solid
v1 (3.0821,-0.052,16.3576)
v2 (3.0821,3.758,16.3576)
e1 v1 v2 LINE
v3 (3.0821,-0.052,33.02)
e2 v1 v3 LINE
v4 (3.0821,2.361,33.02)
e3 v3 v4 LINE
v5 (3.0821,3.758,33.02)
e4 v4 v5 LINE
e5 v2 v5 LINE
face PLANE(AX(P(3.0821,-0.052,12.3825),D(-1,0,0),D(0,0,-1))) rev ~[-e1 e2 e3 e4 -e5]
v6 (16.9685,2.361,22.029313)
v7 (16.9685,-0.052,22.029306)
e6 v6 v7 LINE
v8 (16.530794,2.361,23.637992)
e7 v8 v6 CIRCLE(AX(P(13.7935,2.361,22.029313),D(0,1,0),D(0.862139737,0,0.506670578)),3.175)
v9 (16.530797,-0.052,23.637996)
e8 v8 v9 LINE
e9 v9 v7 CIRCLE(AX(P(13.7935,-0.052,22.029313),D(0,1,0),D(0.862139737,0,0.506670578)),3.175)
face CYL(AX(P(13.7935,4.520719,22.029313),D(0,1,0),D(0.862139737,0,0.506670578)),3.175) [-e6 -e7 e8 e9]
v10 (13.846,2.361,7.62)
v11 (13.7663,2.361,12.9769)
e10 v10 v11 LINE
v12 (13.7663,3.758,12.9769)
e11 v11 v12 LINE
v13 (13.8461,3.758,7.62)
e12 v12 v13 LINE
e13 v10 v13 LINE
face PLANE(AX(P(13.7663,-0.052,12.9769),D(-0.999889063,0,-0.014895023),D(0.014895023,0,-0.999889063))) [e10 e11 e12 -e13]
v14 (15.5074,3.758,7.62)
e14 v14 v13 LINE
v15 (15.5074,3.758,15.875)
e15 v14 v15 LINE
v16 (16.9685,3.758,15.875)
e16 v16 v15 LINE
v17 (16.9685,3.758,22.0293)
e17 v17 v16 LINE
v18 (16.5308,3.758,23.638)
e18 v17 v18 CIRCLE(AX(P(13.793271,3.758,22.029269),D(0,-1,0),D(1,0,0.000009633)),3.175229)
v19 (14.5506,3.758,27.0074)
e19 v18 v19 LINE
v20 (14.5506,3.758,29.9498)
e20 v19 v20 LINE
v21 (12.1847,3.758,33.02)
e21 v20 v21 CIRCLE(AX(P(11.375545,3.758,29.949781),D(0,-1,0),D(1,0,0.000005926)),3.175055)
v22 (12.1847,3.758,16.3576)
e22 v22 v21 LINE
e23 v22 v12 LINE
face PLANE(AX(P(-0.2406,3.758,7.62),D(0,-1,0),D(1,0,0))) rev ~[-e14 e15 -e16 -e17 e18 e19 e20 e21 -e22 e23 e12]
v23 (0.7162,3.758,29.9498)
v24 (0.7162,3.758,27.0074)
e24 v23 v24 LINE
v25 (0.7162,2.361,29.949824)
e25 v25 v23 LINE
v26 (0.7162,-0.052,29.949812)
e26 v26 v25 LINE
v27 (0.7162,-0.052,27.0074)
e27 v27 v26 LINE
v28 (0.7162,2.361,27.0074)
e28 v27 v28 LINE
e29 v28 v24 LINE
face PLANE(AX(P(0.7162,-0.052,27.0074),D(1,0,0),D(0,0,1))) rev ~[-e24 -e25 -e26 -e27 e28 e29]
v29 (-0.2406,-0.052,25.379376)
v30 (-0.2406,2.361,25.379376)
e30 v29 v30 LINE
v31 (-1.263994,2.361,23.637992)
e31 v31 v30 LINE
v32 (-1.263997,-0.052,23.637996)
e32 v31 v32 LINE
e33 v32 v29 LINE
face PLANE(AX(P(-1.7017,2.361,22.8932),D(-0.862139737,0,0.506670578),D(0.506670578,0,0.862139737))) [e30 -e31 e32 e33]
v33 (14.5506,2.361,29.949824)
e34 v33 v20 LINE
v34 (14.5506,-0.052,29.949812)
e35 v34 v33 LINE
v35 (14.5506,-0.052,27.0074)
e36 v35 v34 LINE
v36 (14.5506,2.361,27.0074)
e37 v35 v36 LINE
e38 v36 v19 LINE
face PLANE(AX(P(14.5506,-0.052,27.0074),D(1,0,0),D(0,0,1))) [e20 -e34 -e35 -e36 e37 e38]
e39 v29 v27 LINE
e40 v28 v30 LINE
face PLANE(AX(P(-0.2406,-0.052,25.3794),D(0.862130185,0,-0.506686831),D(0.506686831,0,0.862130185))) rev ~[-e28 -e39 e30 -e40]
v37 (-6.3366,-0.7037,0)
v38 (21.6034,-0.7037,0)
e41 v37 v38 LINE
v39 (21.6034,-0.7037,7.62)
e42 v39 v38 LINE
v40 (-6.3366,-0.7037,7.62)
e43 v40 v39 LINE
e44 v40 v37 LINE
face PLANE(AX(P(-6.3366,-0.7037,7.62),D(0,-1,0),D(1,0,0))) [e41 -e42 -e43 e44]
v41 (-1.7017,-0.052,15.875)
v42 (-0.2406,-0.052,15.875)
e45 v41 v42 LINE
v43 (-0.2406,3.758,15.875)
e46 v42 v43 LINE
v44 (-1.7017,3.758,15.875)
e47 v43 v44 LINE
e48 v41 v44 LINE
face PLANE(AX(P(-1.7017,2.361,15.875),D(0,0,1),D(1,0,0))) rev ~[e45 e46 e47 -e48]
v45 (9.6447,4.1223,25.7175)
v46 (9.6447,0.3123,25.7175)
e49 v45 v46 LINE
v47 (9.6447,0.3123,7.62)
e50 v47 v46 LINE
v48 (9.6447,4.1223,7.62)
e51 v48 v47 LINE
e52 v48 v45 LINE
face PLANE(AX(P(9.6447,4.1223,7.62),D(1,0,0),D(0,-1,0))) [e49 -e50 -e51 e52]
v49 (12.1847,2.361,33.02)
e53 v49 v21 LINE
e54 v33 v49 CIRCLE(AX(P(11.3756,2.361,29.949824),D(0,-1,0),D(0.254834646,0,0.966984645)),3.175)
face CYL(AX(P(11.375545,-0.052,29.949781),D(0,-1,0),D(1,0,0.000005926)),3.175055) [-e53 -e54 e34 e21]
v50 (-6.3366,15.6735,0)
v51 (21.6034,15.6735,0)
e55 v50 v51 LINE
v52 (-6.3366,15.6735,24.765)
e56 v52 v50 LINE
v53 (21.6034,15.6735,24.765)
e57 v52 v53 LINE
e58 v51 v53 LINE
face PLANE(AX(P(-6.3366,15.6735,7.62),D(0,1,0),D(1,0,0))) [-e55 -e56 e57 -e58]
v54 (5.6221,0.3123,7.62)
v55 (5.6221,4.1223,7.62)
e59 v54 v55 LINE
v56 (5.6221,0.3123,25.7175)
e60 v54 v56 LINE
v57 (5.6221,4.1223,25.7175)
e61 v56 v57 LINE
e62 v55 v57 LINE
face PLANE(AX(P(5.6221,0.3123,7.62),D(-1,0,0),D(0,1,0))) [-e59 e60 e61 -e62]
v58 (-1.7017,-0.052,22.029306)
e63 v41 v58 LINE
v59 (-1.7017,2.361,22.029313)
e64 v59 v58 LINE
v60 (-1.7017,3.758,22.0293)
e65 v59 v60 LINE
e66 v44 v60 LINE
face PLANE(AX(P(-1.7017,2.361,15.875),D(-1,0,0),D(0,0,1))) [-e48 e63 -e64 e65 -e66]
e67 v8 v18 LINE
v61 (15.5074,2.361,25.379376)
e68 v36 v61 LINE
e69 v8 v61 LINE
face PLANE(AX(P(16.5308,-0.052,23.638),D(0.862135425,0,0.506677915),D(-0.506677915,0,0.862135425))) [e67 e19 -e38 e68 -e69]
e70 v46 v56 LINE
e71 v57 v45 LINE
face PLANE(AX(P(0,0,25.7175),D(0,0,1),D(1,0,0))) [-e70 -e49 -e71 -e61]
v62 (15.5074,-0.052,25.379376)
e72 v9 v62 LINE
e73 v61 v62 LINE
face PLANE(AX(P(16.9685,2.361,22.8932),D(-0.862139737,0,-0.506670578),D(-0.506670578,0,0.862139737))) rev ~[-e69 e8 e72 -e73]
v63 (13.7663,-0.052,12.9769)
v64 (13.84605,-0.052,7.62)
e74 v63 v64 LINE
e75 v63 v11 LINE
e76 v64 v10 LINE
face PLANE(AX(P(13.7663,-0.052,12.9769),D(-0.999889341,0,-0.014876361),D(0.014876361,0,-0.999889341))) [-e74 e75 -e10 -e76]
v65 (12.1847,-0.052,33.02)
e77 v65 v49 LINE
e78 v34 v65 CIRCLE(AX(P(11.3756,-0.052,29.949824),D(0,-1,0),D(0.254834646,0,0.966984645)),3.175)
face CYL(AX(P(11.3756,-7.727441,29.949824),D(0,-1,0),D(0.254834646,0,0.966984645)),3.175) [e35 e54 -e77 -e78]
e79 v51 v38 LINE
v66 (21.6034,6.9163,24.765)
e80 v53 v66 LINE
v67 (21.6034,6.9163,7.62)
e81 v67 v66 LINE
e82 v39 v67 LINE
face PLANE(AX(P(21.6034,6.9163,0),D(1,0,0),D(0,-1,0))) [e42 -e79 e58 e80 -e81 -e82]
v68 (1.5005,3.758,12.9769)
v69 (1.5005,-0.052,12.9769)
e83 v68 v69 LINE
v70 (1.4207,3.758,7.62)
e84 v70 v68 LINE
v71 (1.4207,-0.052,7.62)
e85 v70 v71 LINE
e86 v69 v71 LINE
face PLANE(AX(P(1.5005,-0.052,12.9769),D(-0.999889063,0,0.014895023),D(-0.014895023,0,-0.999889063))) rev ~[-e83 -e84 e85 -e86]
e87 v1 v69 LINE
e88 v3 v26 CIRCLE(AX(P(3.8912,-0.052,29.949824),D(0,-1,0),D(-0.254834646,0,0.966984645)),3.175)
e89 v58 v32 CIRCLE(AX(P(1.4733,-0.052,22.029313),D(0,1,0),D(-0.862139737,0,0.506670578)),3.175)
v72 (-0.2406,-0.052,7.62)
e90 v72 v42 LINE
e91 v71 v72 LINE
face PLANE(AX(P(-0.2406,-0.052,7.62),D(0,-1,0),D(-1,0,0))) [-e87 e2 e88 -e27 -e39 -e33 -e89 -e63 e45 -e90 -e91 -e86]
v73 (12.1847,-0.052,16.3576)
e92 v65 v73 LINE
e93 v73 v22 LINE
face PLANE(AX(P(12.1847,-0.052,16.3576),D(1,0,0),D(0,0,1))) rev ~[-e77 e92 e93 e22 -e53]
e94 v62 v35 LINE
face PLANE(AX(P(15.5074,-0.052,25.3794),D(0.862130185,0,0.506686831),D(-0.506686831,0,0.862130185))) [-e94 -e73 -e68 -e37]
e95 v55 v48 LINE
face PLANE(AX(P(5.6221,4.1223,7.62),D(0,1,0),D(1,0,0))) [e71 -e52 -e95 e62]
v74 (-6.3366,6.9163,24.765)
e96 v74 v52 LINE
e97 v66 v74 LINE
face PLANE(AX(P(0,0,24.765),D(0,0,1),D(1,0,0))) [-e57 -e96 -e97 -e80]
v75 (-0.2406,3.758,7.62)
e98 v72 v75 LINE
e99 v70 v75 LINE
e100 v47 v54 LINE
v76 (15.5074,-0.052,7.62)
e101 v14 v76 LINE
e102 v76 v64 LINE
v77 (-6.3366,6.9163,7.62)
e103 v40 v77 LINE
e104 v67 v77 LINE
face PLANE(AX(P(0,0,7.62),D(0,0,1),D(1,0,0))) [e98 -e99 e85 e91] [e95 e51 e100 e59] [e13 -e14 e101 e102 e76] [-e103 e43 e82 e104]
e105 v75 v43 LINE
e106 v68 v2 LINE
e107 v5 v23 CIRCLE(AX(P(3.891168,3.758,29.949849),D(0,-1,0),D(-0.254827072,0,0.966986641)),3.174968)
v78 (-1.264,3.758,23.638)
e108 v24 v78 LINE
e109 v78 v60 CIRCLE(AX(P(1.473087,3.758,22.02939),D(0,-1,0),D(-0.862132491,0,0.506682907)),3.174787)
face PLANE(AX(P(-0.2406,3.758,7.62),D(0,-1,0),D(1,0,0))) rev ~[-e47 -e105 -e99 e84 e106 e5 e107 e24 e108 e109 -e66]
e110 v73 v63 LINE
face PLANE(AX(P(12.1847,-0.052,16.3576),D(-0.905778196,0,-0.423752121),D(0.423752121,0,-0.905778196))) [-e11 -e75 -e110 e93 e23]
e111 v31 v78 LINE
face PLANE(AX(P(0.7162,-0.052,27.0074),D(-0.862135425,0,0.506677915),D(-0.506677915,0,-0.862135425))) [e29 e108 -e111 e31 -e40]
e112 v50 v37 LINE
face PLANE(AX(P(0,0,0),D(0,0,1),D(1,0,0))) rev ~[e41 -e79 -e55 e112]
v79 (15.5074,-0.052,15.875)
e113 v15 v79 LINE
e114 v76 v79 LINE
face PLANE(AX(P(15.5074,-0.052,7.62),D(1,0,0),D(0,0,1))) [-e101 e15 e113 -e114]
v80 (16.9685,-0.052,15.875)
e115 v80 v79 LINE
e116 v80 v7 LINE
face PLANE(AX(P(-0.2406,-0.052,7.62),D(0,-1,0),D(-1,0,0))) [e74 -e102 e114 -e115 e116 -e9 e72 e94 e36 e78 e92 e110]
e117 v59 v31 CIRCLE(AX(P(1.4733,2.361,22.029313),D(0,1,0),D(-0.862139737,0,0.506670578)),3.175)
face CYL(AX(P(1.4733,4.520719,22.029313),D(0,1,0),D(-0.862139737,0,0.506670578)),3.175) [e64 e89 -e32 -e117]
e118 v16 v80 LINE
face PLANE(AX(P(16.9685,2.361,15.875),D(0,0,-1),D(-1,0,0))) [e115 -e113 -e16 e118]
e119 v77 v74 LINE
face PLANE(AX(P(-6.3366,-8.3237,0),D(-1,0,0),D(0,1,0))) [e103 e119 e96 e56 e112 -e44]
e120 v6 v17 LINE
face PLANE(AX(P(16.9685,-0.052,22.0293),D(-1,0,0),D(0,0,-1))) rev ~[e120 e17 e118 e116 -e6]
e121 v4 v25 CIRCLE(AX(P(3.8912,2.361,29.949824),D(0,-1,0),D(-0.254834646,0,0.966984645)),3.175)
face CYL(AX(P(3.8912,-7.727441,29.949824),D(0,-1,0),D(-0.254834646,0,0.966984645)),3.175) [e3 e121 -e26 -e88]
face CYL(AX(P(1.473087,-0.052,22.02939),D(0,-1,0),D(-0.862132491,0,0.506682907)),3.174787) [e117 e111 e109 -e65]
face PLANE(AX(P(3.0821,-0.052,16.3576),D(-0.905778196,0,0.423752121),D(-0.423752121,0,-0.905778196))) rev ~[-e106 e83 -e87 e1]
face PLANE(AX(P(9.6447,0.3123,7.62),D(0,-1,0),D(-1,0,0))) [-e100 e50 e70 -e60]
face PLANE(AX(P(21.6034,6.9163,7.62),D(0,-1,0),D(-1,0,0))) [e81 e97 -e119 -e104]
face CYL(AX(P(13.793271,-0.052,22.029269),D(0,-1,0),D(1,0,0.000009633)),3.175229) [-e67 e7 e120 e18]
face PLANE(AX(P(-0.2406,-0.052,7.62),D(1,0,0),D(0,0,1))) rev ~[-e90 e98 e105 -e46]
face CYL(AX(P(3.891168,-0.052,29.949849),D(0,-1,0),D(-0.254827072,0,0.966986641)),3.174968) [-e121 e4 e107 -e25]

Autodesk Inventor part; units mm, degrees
ref_plane "YZ Plane" through (0, 0, 0) normal (1, 0, 0) x (0, 1, 0)
ref_plane "XZ Plane" through (0, 0, 0) normal (0, 1, 0) x (-1, 0, 0)
ref_plane "XY Plane" through (0, 0, 0) normal (0, 0, 1) x (1, 0, 0)
sketch "Sketch1" plane through (0, 0, 0) normal (0, 0, 1) x (1, 0, 0)
  line L0 (-6.3366, 6.9163) -> (21.6034, 6.9163)
  line L1 (21.6034, 6.9163) -> (21.6034, -8.3237)
  line L2 (21.6034, -8.3237) -> (-6.3366, -8.3237)
  line L3 (-6.3366, -8.3237) -> (-6.3366, 6.9163)
  point P0 (0, 0)
  dimension "d0" = 27.94
  dimension "d1" = 15.24
extrude "Extrusion1" add sketch "Sketch1" along normal blind 7.62
sketch "Sketch2" plane through (0, 0, 7.62) normal (0, 0, 1) x (1, 0, 0)
  line L0 (-6.3366, 6.9163) -> (-6.3366, -8.3237) projected
  line L1 (21.6034, -8.3237) -> (21.6034, 6.9163) projected
  line L2 (21.6034, -0.052) -> (21.6034, 2.361)
  line L3 (-6.3366, 2.361) -> (-6.3366, -0.052)
  line L4 (21.6034, 6.9163) -> (-6.3366, 6.9163) projected
  line L5 (-6.3366, -8.3237) -> (21.6034, -8.3237) projected
  line L6 (0.9631, 2.361) -> (-0.2406, 2.361)
  line L7 (-0.2406, -0.052) -> (0.9631, -0.052)
  line L8 (-0.2406, -0.052) -> (-0.2406, 2.361)
  line L9 (-0.2406, -0.052) -> (3.0821, -0.052)
  line L10 (3.0821, -0.052) -> (3.0821, 2.361)
  line L11 (3.0821, 2.361) -> (-0.2406, 2.361)
  line L12 (-0.2406, 2.361) -> (-0.2406, -0.052)
  line L13 (14.3038, 2.361) -> (15.5074, 2.361)
  line L14 (15.5074, -0.052) -> (14.3038, -0.052)
  line L15 (15.5074, -0.052) -> (15.5074, 2.361)
  line L16 (15.5074, -0.052) -> (12.1847, -0.052)
  line L17 (12.1847, -0.052) -> (12.1847, 2.361)
  line L18 (12.1847, 2.361) -> (15.5074, 2.361)
  line L19 (15.5074, 2.361) -> (15.5074, -0.052)
  line L20 (-6.3366, -0.7037) -> (21.6034, -0.7037)
  line L21 (-6.3366, 2.361) -> (21.6034, 2.361)
  line L22 (21.6034, 2.361) -> (21.6034, -0.052)
  line L23 (21.6034, -0.052) -> (-6.3366, -0.052)
  line L24 (-6.3366, -0.052) -> (-6.3366, 2.361)
  point P0 (0, 0)
  point P1 (-0.2406, 1.1545)
  point P2 (15.2669, -0.3643)
  point P3 (15.5074, 1.1545)
  point P4 (15.5074, -0.052)
  point P5 (21.6034, -0.052)
  point P6 (15.5074, 2.361)
  point P7 (-6.3366, -0.052)
  point P8 (-0.2406, -0.052)
  point P9 (-0.2406, 2.361)
  point P10 (-6.3366, 2.361)
  point P11 (3.0821, -0.052)
  point P12 (12.1847, -0.052)
  point P13 (12.1847, 2.361)
  point P14 (3.0821, 2.361)
  dimension "d6" = 6.096
extrude "Extrusion2" add sketch "Sketch2" along normal blind 8.7376 contours L6 L11 L10 L9 L7 L8 | L15 L14 L16 L17 L18 L13
sketch "Sketch3" plane through (-0.2406, 2.361, 7.62) normal (0, 1, 0) x (1, 0, 0)
  line L0 (3.3227, -8.7376) -> (0, -8.7376) projected
  line L1 (-6.096, 7.62) -> (21.844, 7.62) projected
  line L2 (3.3227, -11.3552) -> (3.3227, -8.7376)
  line L3 (12.4253, -11.3552) -> (12.4253, -8.7376)
  line L4 (17.2091, -8.255) -> (17.2091, -15.2732)
  line L5 (17.2091, -15.2732) -> (14.9854, -19.057)
  line L6 (14.9854, -19.057) -> (12.4253, -19.057)
  line L7 (12.4253, -19.057) -> (12.4253, -8.7376)
  line L8 (7.874, 7.62) -> (7.874, -24.8322)
  line L9 (3.3227, -11.3552) -> (3.3227, -8.7376)
  line L10 (-1.4611, -8.255) -> (-1.4611, -15.2732)
  line L11 (-1.4611, -15.2732) -> (0.7626, -19.057)
  line L12 (0.7626, -19.057) -> (3.3227, -19.057)
  line L13 (3.3227, -19.057) -> (3.3227, -8.7376)
  line L14 (17.2091, -8.255) -> (12.4253, -8.255)
  line L15 (12.4253, 0) -> (12.4253, -8.7376) projected
  line L16 (12.4253, -8.255) -> (12.4253, -8.7376)
  line L17 (-1.4611, -8.255) -> (3.3227, -8.255)
  line L18 (3.3227, 0) -> (3.3227, -8.7376) projected
  line L19 (3.3227, -8.255) -> (3.3227, -8.7376)
  point P0 (0.2406, 7.62)
extrude "Extrusion4" add sketch "Sketch2" along normal blind 25.4 contours L6 L11 L10 L9 L7 L8 | L15 L14 L16 L17 L18 L13
sketch "Sketch4" plane through (-6.3366, 6.9163, 0) normal (0, 1, 0) x (1, 0, 0)
  point P0 (6.3366, 0)
sketch "Sketch5" plane through (0, 0, 7.62) normal (0, 0, 1) x (1, 0, 0)
  line L0 (21.6034, 6.9163) -> (-6.3366, 6.9163) projected
  line L1 (-6.3366, 15.6735) -> (21.6034, 15.6735)
  line L2 (21.6034, 15.6735) -> (21.6034, 6.9163)
  line L3 (21.6034, 6.9163) -> (-6.3366, 6.9163)
  line L4 (-6.3366, 6.9163) -> (-6.3366, 15.6735)
  point P0 (0, 0)
extrude "Extrusion5" add sketch "Sketch5" along normal blind 17.145 and the other way blind 7.62
extrude "Extrusion6" cut sketch "Sketch2" against normal blind 25.4 contours L20 L1 L5 L0
extrude "Extrusion7" add sketch "Sketch2" along normal blind 4.7625 contours L21 L8 L23 L0 | L1 L23 L15 L21 | L21 L17 L23 L10
extrude "Extrusion8" add sketch "Sketch3" against normal up to surface (2.413 mm away)
sketch "Sketch6" plane through (-6.3366, -0.052, 7.62) normal (0, -1, 0) x (1, 0, 0)
  line L0 (27.94, 0) -> (27.94, 4.7625) projected
  line L1 (21.844, 4.7625) -> (21.844, 8.255) projected
  line L2 (27.94, 0) -> (21.844, 0)
  line L3 (21.844, 0) -> (21.844, 4.7625)
  line L4 (21.844, 4.7625) -> (27.94, 4.7625)
  line L5 (27.94, 4.7625) -> (27.94, 0)
  line L6 (18.5213, 4.7625) -> (18.5213, 25.4) projected
  line L7 (18.5213, 4.7625) -> (9.4187, 4.7625)
  line L8 (9.4187, 4.7625) -> (9.4187, 0)
  line L9 (9.4187, 0) -> (18.5213, 0)
  line L10 (18.5213, 0) -> (18.5213, 4.7625)
  line L11 (6.096, 4.7625) -> (6.096, 8.255) projected
  line L12 (0, 0) -> (0, 4.7625) projected
  line L13 (6.096, 4.7625) -> (0, 4.7625)
  line L14 (0, 4.7625) -> (0, 0)
  line L15 (0, 0) -> (6.096, 0)
  line L16 (6.096, 0) -> (6.096, 4.7625)
  point P0 (6.3366, -7.62)
  point P1 (21.844, 8.7376)
  point P2 (18.5213, 19.057)
  point P3 (6.096, 8.7376)
extrude "Extrusion9" cut sketch "Sketch6" against normal up to surface (6.9683 mm away)
sketch "Sketch7" plane through (12.1847, -0.052, 7.62) normal (0, -1, 0) x (1, 0, 0)
  line L0 (3.3227, 17.7594) -> (4.7838, 15.2732) projected
  line L1 (3.3227, 17.7594) -> (2.3659, 19.3874)
  line L2 (2.3659, 19.3874) -> (2.3659, 25.4)
  line L3 (3.3227, 25.4) -> (0, 25.4) projected
  line L4 (3.3227, 17.7594) -> (3.3227, 25.4) projected
  line L5 (2.3659, 25.4) -> (3.3227, 25.4)
  line L6 (3.3227, 25.4) -> (3.3227, 17.7594)
  line L7 (-18.5213, -7.62) -> (9.4187, -7.62) projected
  line L8 (-12.4253, 17.7594) -> (-11.4685, 19.3874)
  line L9 (-11.4685, 19.3874) -> (-11.4685, 25.4)
  line L10 (-12.4253, 17.7594) -> (-12.4253, 25.4)
  line L11 (-11.4685, 25.4) -> (-12.4253, 25.4)
  line L12 (-12.4253, 25.4) -> (-12.4253, 17.7594)
  line L13 (-12.4253, 8.7376) -> (-13.8865, 8.255) projected
  line L14 (-9.1825, 8.7376) -> (-9.1026, 8.7376)
  line L15 (-9.1026, 0) -> (-9.1026, 25.4) projected
  line L16 (-10.6842, 5.3569) -> (-10.764, 0)
  line L17 (-9.1026, 0) -> (-12.4253, 0) projected
  line L18 (-9.1026, 0) -> (-9.1026, 8.7376)
  line L19 (-10.764, 0) -> (-9.1026, 0)
  line L20 (9.4187, -7.62) -> (-18.5213, -7.62) projected
  line L21 (-18.5213, 17.145) -> (9.4187, 17.145) projected
  line L22 (1.5816, 5.3569) -> (1.6613, 0)
  line L23 (1.6613, 0) -> (0, 0)
  line L24 (0, 0) -> (0, 8.7376)
  line L25 (-4.5513, -7.62) -> (-4.5513, 0)
  line L26 (-4.5513, 11.274) -> (-4.5513, 11.3382)
  line L27 (-9.1026, 8.7376) -> (-10.6842, 5.3569)
  line L28 (0, 8.7376) -> (1.5816, 5.3569)
  point P0 (-12.1847, -7.62)
extrude "Extrusion10" cut sketch "Sketch7" against normal up to surface (6.9683 mm away)
fillet "Fillet1" radius 3.175 4 edges at (0.7162, 1.1545, 33.02) (14.5507, 1.1545, 33.02) (16.9686, 1.1545, 22.8932) (-1.7017, 1.1545, 22.8932)
sketch "Sketch8" plane through (-0.2406, -0.052, 7.62) normal (0, -1, 0) x (1, 0, 0)
  arc A0 (-1.0234, 16.018) -> (-1.4611, 14.4093) centre (1.7139, 14.4093) ccw projected
  line L0 (-1.4611, 8.255) -> (-1.4611, 14.4093) projected
  line L1 (0, 0) -> (0, 8.255) projected
  line L2 (1.6613, 0) -> (0, 0) projected
  line L3 (1.6613, 0) -> (1.7411, 5.3569) projected
  line L4 (1.7411, 5.3569) -> (3.3227, 8.7376) projected
  line L5 (3.3227, 8.7376) -> (3.3227, 25.4) projected
  arc A1 (3.3227, 25.4) -> (0.9568, 22.3298) centre (4.1318, 22.3298) ccw projected
  line L6 (0.9568, 22.3298) -> (0.9568, 19.3874) projected
  line L7 (0.9568, 19.3874) -> (-1.0234, 16.018) projected
  arc A2 (17.2091, 14.4093) -> (16.7714, 16.018) centre (14.0341, 14.4093) ccw projected
  line L8 (16.7714, 16.018) -> (14.7912, 19.3874) projected
  line L9 (14.7912, 19.3874) -> (14.7912, 22.3298) projected
  arc A3 (14.7912, 22.3298) -> (12.4253, 25.4) centre (11.6162, 22.3298) ccw projected
  line L10 (12.4253, 8.7376) -> (12.4253, 25.4) projected
  line L11 (12.4253, 8.7376) -> (14.0069, 5.3569) projected
  line L12 (14.0069, 5.3569) -> (14.0867, 0) projected
  line L13 (15.748, 0) -> (14.0867, 0) projected
  line L14 (15.748, 0) -> (15.748, 8.255) projected
  line L15 (17.2091, 14.4093) -> (17.2091, 8.255) projected
  line L16 (17.2091, 8.255) -> (15.748, 8.255) projected
  line L17 (0, 8.255) -> (-1.4611, 8.255) projected
  point P0 (0.2406, -7.62)
extrude "Extrusion11" add sketch "Sketch8" against normal blind 3.81
sketch "Sketch9" plane through (0, 0, 7.62) normal (0, 0, 1) x (1, 0, 0)
  line L0 (9.6447, 0.3123) -> (5.6221, 0.3123)
  line L1 (5.6221, 0.3123) -> (5.6221, 4.1223)
  line L2 (5.6221, 4.1223) -> (9.6447, 4.1223)
  line L3 (9.6447, 4.1223) -> (9.6447, 0.3123)
  line L4 (12.1847, -0.052) -> (12.1847, 3.758) projected
  line L5 (3.0821, -0.052) -> (3.0821, 3.758) projected
  point P0 (0, 0)
  dimension "d30" = 2.54
  dimension "d31" = 2.54
extrude "Extrusion12" add sketch "Sketch9" along normal blind 18.0975
properties part number "Attachment5"
